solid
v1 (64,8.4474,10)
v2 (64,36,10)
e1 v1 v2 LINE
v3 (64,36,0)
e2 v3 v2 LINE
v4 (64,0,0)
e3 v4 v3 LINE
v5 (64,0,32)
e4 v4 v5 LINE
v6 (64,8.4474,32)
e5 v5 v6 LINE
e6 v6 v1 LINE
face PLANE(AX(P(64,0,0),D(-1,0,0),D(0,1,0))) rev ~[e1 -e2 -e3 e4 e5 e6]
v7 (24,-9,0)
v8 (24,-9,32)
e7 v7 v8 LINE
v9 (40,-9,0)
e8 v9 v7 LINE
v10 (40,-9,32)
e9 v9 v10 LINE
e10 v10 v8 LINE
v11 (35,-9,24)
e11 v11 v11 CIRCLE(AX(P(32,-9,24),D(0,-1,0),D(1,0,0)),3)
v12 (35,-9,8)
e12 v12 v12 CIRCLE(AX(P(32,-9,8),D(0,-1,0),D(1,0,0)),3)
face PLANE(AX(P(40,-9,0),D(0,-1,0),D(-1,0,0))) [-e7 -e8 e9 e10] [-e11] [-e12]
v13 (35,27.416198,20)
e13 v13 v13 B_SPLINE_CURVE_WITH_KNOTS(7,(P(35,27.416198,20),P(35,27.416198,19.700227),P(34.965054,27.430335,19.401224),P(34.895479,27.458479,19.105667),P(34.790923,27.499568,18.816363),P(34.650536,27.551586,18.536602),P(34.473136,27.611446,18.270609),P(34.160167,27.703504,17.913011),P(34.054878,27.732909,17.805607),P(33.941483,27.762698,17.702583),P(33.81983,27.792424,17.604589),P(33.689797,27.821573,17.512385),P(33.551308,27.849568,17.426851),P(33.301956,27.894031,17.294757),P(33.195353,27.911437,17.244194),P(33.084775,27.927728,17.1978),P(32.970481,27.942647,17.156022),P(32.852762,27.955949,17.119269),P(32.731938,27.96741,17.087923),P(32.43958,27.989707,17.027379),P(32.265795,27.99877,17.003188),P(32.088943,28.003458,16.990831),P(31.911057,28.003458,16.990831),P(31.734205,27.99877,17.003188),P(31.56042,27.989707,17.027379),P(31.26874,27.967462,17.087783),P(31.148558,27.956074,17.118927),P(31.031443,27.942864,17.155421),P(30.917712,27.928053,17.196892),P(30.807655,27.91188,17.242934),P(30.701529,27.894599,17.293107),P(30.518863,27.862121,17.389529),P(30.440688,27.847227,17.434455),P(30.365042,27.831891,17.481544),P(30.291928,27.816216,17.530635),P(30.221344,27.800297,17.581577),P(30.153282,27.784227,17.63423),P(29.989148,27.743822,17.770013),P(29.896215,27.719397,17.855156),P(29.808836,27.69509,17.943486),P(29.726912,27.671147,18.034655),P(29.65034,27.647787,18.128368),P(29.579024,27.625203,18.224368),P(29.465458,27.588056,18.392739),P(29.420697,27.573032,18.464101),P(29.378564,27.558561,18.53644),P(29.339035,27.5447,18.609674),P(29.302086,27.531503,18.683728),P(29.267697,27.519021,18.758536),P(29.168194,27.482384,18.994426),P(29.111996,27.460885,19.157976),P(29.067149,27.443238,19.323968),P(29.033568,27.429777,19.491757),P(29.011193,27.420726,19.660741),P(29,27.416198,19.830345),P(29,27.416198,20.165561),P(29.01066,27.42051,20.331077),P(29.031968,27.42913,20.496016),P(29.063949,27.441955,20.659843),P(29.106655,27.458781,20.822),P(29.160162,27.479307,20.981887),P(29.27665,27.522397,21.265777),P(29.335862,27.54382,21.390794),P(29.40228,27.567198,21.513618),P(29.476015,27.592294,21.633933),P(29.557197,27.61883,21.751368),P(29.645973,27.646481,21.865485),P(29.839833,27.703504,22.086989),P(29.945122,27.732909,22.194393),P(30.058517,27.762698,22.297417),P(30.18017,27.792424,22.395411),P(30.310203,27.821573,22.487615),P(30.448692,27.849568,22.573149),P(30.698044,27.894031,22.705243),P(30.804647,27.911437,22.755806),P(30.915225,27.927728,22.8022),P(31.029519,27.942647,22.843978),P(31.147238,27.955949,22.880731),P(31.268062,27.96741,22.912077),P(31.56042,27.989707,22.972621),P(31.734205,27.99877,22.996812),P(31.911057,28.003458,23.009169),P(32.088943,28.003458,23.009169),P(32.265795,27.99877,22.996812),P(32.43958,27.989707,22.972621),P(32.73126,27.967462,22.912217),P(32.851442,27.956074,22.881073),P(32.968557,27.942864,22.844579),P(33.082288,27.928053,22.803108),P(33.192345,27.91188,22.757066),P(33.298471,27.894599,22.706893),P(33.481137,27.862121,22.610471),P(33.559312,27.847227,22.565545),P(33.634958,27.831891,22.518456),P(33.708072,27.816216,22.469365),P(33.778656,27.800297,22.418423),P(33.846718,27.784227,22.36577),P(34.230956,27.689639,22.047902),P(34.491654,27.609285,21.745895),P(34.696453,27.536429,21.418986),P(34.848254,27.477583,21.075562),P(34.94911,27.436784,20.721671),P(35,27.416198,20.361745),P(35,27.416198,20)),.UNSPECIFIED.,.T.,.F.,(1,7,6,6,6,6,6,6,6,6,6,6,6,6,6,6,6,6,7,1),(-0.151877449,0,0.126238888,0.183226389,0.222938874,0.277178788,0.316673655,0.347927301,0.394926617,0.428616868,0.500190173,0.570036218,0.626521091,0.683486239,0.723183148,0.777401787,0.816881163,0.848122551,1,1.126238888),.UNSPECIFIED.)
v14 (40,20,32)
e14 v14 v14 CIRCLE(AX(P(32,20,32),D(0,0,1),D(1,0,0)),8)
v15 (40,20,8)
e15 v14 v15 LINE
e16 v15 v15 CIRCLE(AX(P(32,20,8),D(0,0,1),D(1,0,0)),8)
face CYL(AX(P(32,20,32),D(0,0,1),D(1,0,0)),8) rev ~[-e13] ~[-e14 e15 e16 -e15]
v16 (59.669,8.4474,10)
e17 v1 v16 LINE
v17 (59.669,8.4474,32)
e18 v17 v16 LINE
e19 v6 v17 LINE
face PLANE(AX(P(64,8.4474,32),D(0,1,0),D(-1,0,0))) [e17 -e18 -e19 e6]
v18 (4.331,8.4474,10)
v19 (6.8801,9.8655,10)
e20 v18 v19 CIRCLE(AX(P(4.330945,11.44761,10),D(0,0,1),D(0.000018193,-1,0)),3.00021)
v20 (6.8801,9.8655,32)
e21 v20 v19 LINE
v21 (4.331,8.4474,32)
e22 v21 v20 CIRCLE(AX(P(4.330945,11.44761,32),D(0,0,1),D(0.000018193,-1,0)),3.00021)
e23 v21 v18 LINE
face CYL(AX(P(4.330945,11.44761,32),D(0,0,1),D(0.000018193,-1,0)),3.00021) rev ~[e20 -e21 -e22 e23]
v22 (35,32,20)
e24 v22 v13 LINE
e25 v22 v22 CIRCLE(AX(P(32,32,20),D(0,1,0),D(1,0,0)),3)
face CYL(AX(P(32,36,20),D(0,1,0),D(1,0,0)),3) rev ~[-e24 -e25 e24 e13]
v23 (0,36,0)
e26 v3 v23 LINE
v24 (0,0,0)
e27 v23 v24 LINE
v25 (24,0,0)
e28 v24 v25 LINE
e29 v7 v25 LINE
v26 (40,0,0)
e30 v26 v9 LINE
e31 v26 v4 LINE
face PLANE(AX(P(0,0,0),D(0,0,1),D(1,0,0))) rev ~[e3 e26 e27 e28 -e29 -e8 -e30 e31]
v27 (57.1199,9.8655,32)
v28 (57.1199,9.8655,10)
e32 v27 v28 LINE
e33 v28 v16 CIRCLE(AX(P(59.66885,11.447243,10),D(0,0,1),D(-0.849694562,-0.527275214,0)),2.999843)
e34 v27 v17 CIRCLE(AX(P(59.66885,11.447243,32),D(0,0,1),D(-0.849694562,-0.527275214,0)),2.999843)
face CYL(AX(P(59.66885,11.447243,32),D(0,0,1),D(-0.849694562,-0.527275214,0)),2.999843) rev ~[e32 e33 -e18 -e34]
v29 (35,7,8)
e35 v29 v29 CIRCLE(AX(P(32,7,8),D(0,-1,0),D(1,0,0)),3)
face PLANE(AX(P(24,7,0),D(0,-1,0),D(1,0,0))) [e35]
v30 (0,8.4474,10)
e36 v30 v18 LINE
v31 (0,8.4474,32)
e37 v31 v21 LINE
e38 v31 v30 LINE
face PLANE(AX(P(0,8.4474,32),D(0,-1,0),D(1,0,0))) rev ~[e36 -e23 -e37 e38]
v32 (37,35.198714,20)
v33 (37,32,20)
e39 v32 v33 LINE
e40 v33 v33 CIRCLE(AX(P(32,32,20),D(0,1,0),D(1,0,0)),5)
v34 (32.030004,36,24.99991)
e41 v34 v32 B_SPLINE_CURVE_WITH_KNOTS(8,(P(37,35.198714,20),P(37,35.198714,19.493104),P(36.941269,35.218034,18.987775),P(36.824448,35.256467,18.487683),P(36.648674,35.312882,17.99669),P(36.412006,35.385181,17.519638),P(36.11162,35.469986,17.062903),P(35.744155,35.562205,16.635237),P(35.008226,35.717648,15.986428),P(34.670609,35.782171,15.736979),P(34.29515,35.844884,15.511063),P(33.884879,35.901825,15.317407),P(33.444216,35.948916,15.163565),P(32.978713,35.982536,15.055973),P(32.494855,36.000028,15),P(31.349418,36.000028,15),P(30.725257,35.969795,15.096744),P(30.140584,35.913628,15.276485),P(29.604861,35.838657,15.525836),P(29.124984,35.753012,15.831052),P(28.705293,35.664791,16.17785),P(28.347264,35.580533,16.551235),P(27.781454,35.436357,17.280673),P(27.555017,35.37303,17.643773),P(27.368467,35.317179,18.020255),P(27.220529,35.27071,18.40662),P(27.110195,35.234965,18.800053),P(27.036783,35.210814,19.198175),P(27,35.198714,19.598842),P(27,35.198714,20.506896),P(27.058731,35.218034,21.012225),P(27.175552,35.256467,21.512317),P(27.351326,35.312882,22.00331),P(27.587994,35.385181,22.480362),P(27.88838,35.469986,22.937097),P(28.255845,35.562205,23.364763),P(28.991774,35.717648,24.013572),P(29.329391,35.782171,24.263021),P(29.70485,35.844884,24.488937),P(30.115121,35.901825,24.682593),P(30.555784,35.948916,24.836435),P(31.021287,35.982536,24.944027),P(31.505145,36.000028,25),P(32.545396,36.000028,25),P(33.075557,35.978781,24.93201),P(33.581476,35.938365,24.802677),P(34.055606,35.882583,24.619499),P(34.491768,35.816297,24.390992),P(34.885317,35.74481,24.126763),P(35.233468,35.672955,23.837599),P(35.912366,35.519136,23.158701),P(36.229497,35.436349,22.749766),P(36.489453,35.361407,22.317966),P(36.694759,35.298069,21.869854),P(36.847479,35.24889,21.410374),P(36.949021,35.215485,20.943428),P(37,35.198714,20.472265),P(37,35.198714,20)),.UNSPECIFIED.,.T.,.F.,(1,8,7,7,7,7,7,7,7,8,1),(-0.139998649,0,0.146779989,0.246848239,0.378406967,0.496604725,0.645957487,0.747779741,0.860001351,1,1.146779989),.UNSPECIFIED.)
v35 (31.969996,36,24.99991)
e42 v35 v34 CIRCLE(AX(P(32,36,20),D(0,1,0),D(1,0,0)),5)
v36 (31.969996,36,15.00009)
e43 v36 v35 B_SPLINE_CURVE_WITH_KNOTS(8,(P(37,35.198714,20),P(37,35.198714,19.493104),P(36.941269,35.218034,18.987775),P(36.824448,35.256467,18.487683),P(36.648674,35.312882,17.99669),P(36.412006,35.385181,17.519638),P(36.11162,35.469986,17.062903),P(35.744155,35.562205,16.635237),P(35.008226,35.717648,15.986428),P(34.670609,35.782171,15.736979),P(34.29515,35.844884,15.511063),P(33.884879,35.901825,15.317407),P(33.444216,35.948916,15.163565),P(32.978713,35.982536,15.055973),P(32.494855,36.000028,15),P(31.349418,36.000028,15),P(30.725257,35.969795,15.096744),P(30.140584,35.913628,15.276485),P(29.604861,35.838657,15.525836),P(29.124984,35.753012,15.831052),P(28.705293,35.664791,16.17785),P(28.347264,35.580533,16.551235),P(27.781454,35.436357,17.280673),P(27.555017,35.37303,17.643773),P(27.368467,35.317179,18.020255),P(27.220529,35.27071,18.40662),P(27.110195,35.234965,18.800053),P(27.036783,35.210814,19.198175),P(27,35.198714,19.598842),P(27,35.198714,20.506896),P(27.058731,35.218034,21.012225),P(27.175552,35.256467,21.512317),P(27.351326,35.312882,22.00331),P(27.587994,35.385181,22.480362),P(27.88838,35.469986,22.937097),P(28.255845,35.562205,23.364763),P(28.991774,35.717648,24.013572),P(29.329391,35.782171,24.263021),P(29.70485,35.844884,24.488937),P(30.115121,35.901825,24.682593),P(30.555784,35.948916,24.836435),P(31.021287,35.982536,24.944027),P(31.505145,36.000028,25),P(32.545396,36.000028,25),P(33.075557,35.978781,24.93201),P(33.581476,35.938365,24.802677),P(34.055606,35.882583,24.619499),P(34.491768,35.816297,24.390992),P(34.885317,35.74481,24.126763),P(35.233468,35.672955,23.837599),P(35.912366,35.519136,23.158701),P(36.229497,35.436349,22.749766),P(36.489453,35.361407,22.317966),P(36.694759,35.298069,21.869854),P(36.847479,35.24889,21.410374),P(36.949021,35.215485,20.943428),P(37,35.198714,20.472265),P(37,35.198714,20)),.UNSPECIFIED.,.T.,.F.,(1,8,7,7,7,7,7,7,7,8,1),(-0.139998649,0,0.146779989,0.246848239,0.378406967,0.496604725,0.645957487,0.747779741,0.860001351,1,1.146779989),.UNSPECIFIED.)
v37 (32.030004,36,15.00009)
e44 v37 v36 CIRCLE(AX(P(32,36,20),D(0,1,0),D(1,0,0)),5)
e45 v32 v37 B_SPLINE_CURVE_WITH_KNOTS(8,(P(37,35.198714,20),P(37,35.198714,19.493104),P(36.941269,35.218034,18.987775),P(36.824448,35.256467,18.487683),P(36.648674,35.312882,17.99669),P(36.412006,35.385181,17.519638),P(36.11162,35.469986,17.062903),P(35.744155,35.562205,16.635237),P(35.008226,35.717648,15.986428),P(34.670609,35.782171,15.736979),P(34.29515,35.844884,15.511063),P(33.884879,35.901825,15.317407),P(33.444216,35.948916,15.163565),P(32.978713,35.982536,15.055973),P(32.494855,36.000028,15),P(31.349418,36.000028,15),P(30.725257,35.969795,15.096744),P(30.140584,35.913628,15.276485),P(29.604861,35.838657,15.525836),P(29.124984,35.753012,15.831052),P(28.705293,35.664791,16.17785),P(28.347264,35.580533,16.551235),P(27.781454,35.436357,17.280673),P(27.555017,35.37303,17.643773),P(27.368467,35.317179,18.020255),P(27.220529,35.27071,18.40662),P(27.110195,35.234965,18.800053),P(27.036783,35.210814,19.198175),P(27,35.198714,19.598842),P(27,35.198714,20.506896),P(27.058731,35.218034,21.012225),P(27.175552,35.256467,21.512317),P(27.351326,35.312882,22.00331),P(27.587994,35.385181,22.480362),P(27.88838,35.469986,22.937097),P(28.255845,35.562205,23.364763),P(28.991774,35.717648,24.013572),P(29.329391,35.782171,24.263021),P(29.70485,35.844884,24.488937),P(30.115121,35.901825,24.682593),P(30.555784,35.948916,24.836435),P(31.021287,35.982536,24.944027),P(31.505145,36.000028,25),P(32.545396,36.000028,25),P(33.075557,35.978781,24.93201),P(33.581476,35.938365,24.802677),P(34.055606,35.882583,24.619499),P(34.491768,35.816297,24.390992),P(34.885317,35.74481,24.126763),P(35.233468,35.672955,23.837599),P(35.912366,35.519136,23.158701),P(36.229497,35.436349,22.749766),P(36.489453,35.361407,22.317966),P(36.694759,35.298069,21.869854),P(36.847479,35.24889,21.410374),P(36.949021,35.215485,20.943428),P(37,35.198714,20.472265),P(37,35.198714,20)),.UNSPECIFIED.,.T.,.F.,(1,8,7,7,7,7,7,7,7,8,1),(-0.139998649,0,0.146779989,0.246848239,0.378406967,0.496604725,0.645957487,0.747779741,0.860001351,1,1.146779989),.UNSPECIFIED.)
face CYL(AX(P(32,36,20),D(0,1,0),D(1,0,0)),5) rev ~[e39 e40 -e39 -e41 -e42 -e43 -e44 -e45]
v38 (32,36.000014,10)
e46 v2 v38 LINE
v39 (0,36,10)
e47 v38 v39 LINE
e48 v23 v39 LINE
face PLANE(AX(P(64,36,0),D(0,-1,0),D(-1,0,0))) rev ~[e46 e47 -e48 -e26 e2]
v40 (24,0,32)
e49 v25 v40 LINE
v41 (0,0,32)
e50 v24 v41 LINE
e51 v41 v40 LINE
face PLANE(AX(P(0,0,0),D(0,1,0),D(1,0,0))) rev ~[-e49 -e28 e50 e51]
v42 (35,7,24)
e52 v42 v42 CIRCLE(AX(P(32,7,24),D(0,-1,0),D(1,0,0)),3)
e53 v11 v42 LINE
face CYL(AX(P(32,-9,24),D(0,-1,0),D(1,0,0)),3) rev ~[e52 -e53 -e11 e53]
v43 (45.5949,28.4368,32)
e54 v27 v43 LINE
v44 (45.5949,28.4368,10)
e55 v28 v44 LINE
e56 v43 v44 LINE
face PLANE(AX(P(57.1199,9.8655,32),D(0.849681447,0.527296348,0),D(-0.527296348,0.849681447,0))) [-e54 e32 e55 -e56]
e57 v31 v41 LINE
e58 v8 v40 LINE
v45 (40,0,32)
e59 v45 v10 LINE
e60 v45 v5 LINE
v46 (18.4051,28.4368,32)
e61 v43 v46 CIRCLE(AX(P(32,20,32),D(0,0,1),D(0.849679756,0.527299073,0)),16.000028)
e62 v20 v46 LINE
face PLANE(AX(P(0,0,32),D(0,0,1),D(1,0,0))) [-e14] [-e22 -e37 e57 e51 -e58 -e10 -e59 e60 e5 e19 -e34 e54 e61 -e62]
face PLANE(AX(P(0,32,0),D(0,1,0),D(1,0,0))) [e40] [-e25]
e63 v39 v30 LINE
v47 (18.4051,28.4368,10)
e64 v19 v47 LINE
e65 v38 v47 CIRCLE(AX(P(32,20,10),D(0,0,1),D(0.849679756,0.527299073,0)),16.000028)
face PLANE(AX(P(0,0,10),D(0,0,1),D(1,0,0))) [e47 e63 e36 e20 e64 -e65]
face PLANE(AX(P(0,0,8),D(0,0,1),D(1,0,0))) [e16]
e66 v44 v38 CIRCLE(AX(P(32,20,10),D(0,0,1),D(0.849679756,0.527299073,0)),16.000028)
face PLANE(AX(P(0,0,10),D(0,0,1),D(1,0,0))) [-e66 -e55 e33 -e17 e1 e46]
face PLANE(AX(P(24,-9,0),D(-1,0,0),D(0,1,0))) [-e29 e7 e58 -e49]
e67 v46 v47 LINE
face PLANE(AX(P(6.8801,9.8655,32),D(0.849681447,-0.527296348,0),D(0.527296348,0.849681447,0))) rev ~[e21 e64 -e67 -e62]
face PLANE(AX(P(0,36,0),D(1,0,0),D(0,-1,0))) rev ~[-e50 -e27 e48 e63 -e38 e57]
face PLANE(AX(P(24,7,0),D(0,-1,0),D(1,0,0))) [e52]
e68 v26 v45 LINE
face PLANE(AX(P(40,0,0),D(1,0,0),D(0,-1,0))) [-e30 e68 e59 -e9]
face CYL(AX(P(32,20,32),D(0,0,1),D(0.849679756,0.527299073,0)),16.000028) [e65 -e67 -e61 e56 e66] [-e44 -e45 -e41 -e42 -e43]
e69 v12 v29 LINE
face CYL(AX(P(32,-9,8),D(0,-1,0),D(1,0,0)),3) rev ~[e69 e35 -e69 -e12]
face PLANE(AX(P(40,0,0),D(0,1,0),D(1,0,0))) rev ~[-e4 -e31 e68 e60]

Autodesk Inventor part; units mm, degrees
ref_plane "YZ Plane" through (0, 0, 0) normal (1, 0, 0) x (0, 1, 0)
ref_plane "XZ Plane" through (0, 0, 0) normal (0, 1, 0) x (-1, 0, 0)
ref_plane "XY Plane" through (0, 0, 0) normal (0, 0, 1) x (1, 0, 0)
sketch "Sketch1" plane through (0, 0, 0) normal (0, 0, 1) x (1, 0, 0)
  line L0 (64, 0) -> (64, 36)
  line L1 (64, 36) -> (0, 36)
  line L2 (0, 36) -> (0, 0)
  line L3 (40, 0) -> (40, -9)
  line L4 (40, -9) -> (24, -9)
  line L5 (24, -9) -> (24, 0)
  line L6 (0, 0) -> (24, 0)
  line L7 (40, 0) -> (64, 0)
  dimension "d0" = 64
  dimension "d1" = 36
  dimension "d2" = 16
  dimension "d3" = 9
  dimension "d4" = 24
extrude "Extrusion1" add sketch "Sketch1" along normal blind 32
sketch "Sketch2" plane through (0, 0, 32) normal (0, 0, 1) x (1, 0, 0)
  circle A0 centre (32, 20) radius 6
  line L0 (0, 36) -> (0, 0) projected
  line L1 (40, 0) -> (64, 0) projected
  arc A1 (45.5949, 28.4368) -> (18.4051, 28.4368) centre (32, 20) ccw
  line L2 (0, 8.4474) -> (4.331, 8.4474)
  line L3 (6.8801, 9.8655) -> (18.4051, 28.4368)
  line L4 (64, 0) -> (64, 36) projected
  line L5 (64, 8.4474) -> (59.669, 8.4474)
  line L6 (57.1199, 9.8655) -> (45.5949, 28.4368)
  arc A2 (4.331, 8.4474) -> (6.8801, 9.8655) centre (4.331, 11.4474) ccw
  arc A3 (57.1199, 9.8655) -> (59.669, 8.4474) centre (59.669, 11.4474) ccw
  line L7 (0, 8.4474) -> (0, 36)
  line L8 (64, 36) -> (0, 36) projected
  line L9 (0, 36) -> (64, 36)
  line L10 (64, 36) -> (64, 8.4474)
  point P0 (6, 8.4474)
  point P1 (58, 8.4474)
  point P2 (32, 36)
  dimension "d7" = 12
  dimension "d8" = 32
  dimension "d9" = 20
  dimension "d10" = 6
  dimension "d11" = 32
  dimension "d12" = 6
  dimension "d13" = 3
extrude "Extrusion2" cut sketch "Sketch2" against normal blind 22 contours L8 A1 L3 A2 L2 L0 | L8 L4 L5 A3 L6 A1
sketch "Sketch3" plane through (0, 0, 32) normal (0, 0, 1) x (1, 0, 0)
  circle A0 centre (32, 20) radius 8
  line L0 (0, 8.4474) -> (0, 36) projected
  line L1 (40, 0) -> (64, 0) projected
  point P0 (0, 0)
  dimension "d16" = 16
  dimension "d17" = 32
  dimension "d18" = 20
extrude "Extrusion3" cut sketch "Sketch3" against normal blind 24
sketch "Sketch4" plane through (0, 36, 0) normal (0, 1, 0) x (1, 0, 0)
  circle A0 centre (32, -20) radius 3
  line L0 (18.4051, -32) -> (45.5949, -32) projected
  line L1 (0, -32) -> (0, -10) projected
  point P0 (0, 0)
  dimension "d21" = 6
  dimension "d22" = 12
  dimension "d23" = 32
extrude "Extrusion4" cut sketch "Sketch4" against normal blind 16
sketch "Sketch5" plane through (0, 36, 0) normal (0, 1, 0) x (1, 0, 0)
  circle A0 centre (32, -20) radius 5
  line L0 (18.4051, -32) -> (45.5949, -32) projected
  line L1 (0, -32) -> (0, -10) projected
  point P0 (0, 0)
  dimension "d26" = 10
  dimension "d27" = 12
  dimension "d28" = 32
extrude "Extrusion5" cut sketch "Sketch5" against normal blind 4
sketch "Sketch6" plane through (24, -9, 0) normal (0, -1, 0) x (1, 0, 0)
  circle A0 centre (8, 24) radius 3
  circle A1 centre (8, 8) radius 3
  line L0 (0, 32) -> (16, 32) projected
  point P0 (-24, 0)
  dimension "d31" = 6
  dimension "d32" = 6
  dimension "d33" = 8
  dimension "d34" = 16
extrude "Extrusion6" cut sketch "Sketch6" against normal blind 16
properties part number "third"
